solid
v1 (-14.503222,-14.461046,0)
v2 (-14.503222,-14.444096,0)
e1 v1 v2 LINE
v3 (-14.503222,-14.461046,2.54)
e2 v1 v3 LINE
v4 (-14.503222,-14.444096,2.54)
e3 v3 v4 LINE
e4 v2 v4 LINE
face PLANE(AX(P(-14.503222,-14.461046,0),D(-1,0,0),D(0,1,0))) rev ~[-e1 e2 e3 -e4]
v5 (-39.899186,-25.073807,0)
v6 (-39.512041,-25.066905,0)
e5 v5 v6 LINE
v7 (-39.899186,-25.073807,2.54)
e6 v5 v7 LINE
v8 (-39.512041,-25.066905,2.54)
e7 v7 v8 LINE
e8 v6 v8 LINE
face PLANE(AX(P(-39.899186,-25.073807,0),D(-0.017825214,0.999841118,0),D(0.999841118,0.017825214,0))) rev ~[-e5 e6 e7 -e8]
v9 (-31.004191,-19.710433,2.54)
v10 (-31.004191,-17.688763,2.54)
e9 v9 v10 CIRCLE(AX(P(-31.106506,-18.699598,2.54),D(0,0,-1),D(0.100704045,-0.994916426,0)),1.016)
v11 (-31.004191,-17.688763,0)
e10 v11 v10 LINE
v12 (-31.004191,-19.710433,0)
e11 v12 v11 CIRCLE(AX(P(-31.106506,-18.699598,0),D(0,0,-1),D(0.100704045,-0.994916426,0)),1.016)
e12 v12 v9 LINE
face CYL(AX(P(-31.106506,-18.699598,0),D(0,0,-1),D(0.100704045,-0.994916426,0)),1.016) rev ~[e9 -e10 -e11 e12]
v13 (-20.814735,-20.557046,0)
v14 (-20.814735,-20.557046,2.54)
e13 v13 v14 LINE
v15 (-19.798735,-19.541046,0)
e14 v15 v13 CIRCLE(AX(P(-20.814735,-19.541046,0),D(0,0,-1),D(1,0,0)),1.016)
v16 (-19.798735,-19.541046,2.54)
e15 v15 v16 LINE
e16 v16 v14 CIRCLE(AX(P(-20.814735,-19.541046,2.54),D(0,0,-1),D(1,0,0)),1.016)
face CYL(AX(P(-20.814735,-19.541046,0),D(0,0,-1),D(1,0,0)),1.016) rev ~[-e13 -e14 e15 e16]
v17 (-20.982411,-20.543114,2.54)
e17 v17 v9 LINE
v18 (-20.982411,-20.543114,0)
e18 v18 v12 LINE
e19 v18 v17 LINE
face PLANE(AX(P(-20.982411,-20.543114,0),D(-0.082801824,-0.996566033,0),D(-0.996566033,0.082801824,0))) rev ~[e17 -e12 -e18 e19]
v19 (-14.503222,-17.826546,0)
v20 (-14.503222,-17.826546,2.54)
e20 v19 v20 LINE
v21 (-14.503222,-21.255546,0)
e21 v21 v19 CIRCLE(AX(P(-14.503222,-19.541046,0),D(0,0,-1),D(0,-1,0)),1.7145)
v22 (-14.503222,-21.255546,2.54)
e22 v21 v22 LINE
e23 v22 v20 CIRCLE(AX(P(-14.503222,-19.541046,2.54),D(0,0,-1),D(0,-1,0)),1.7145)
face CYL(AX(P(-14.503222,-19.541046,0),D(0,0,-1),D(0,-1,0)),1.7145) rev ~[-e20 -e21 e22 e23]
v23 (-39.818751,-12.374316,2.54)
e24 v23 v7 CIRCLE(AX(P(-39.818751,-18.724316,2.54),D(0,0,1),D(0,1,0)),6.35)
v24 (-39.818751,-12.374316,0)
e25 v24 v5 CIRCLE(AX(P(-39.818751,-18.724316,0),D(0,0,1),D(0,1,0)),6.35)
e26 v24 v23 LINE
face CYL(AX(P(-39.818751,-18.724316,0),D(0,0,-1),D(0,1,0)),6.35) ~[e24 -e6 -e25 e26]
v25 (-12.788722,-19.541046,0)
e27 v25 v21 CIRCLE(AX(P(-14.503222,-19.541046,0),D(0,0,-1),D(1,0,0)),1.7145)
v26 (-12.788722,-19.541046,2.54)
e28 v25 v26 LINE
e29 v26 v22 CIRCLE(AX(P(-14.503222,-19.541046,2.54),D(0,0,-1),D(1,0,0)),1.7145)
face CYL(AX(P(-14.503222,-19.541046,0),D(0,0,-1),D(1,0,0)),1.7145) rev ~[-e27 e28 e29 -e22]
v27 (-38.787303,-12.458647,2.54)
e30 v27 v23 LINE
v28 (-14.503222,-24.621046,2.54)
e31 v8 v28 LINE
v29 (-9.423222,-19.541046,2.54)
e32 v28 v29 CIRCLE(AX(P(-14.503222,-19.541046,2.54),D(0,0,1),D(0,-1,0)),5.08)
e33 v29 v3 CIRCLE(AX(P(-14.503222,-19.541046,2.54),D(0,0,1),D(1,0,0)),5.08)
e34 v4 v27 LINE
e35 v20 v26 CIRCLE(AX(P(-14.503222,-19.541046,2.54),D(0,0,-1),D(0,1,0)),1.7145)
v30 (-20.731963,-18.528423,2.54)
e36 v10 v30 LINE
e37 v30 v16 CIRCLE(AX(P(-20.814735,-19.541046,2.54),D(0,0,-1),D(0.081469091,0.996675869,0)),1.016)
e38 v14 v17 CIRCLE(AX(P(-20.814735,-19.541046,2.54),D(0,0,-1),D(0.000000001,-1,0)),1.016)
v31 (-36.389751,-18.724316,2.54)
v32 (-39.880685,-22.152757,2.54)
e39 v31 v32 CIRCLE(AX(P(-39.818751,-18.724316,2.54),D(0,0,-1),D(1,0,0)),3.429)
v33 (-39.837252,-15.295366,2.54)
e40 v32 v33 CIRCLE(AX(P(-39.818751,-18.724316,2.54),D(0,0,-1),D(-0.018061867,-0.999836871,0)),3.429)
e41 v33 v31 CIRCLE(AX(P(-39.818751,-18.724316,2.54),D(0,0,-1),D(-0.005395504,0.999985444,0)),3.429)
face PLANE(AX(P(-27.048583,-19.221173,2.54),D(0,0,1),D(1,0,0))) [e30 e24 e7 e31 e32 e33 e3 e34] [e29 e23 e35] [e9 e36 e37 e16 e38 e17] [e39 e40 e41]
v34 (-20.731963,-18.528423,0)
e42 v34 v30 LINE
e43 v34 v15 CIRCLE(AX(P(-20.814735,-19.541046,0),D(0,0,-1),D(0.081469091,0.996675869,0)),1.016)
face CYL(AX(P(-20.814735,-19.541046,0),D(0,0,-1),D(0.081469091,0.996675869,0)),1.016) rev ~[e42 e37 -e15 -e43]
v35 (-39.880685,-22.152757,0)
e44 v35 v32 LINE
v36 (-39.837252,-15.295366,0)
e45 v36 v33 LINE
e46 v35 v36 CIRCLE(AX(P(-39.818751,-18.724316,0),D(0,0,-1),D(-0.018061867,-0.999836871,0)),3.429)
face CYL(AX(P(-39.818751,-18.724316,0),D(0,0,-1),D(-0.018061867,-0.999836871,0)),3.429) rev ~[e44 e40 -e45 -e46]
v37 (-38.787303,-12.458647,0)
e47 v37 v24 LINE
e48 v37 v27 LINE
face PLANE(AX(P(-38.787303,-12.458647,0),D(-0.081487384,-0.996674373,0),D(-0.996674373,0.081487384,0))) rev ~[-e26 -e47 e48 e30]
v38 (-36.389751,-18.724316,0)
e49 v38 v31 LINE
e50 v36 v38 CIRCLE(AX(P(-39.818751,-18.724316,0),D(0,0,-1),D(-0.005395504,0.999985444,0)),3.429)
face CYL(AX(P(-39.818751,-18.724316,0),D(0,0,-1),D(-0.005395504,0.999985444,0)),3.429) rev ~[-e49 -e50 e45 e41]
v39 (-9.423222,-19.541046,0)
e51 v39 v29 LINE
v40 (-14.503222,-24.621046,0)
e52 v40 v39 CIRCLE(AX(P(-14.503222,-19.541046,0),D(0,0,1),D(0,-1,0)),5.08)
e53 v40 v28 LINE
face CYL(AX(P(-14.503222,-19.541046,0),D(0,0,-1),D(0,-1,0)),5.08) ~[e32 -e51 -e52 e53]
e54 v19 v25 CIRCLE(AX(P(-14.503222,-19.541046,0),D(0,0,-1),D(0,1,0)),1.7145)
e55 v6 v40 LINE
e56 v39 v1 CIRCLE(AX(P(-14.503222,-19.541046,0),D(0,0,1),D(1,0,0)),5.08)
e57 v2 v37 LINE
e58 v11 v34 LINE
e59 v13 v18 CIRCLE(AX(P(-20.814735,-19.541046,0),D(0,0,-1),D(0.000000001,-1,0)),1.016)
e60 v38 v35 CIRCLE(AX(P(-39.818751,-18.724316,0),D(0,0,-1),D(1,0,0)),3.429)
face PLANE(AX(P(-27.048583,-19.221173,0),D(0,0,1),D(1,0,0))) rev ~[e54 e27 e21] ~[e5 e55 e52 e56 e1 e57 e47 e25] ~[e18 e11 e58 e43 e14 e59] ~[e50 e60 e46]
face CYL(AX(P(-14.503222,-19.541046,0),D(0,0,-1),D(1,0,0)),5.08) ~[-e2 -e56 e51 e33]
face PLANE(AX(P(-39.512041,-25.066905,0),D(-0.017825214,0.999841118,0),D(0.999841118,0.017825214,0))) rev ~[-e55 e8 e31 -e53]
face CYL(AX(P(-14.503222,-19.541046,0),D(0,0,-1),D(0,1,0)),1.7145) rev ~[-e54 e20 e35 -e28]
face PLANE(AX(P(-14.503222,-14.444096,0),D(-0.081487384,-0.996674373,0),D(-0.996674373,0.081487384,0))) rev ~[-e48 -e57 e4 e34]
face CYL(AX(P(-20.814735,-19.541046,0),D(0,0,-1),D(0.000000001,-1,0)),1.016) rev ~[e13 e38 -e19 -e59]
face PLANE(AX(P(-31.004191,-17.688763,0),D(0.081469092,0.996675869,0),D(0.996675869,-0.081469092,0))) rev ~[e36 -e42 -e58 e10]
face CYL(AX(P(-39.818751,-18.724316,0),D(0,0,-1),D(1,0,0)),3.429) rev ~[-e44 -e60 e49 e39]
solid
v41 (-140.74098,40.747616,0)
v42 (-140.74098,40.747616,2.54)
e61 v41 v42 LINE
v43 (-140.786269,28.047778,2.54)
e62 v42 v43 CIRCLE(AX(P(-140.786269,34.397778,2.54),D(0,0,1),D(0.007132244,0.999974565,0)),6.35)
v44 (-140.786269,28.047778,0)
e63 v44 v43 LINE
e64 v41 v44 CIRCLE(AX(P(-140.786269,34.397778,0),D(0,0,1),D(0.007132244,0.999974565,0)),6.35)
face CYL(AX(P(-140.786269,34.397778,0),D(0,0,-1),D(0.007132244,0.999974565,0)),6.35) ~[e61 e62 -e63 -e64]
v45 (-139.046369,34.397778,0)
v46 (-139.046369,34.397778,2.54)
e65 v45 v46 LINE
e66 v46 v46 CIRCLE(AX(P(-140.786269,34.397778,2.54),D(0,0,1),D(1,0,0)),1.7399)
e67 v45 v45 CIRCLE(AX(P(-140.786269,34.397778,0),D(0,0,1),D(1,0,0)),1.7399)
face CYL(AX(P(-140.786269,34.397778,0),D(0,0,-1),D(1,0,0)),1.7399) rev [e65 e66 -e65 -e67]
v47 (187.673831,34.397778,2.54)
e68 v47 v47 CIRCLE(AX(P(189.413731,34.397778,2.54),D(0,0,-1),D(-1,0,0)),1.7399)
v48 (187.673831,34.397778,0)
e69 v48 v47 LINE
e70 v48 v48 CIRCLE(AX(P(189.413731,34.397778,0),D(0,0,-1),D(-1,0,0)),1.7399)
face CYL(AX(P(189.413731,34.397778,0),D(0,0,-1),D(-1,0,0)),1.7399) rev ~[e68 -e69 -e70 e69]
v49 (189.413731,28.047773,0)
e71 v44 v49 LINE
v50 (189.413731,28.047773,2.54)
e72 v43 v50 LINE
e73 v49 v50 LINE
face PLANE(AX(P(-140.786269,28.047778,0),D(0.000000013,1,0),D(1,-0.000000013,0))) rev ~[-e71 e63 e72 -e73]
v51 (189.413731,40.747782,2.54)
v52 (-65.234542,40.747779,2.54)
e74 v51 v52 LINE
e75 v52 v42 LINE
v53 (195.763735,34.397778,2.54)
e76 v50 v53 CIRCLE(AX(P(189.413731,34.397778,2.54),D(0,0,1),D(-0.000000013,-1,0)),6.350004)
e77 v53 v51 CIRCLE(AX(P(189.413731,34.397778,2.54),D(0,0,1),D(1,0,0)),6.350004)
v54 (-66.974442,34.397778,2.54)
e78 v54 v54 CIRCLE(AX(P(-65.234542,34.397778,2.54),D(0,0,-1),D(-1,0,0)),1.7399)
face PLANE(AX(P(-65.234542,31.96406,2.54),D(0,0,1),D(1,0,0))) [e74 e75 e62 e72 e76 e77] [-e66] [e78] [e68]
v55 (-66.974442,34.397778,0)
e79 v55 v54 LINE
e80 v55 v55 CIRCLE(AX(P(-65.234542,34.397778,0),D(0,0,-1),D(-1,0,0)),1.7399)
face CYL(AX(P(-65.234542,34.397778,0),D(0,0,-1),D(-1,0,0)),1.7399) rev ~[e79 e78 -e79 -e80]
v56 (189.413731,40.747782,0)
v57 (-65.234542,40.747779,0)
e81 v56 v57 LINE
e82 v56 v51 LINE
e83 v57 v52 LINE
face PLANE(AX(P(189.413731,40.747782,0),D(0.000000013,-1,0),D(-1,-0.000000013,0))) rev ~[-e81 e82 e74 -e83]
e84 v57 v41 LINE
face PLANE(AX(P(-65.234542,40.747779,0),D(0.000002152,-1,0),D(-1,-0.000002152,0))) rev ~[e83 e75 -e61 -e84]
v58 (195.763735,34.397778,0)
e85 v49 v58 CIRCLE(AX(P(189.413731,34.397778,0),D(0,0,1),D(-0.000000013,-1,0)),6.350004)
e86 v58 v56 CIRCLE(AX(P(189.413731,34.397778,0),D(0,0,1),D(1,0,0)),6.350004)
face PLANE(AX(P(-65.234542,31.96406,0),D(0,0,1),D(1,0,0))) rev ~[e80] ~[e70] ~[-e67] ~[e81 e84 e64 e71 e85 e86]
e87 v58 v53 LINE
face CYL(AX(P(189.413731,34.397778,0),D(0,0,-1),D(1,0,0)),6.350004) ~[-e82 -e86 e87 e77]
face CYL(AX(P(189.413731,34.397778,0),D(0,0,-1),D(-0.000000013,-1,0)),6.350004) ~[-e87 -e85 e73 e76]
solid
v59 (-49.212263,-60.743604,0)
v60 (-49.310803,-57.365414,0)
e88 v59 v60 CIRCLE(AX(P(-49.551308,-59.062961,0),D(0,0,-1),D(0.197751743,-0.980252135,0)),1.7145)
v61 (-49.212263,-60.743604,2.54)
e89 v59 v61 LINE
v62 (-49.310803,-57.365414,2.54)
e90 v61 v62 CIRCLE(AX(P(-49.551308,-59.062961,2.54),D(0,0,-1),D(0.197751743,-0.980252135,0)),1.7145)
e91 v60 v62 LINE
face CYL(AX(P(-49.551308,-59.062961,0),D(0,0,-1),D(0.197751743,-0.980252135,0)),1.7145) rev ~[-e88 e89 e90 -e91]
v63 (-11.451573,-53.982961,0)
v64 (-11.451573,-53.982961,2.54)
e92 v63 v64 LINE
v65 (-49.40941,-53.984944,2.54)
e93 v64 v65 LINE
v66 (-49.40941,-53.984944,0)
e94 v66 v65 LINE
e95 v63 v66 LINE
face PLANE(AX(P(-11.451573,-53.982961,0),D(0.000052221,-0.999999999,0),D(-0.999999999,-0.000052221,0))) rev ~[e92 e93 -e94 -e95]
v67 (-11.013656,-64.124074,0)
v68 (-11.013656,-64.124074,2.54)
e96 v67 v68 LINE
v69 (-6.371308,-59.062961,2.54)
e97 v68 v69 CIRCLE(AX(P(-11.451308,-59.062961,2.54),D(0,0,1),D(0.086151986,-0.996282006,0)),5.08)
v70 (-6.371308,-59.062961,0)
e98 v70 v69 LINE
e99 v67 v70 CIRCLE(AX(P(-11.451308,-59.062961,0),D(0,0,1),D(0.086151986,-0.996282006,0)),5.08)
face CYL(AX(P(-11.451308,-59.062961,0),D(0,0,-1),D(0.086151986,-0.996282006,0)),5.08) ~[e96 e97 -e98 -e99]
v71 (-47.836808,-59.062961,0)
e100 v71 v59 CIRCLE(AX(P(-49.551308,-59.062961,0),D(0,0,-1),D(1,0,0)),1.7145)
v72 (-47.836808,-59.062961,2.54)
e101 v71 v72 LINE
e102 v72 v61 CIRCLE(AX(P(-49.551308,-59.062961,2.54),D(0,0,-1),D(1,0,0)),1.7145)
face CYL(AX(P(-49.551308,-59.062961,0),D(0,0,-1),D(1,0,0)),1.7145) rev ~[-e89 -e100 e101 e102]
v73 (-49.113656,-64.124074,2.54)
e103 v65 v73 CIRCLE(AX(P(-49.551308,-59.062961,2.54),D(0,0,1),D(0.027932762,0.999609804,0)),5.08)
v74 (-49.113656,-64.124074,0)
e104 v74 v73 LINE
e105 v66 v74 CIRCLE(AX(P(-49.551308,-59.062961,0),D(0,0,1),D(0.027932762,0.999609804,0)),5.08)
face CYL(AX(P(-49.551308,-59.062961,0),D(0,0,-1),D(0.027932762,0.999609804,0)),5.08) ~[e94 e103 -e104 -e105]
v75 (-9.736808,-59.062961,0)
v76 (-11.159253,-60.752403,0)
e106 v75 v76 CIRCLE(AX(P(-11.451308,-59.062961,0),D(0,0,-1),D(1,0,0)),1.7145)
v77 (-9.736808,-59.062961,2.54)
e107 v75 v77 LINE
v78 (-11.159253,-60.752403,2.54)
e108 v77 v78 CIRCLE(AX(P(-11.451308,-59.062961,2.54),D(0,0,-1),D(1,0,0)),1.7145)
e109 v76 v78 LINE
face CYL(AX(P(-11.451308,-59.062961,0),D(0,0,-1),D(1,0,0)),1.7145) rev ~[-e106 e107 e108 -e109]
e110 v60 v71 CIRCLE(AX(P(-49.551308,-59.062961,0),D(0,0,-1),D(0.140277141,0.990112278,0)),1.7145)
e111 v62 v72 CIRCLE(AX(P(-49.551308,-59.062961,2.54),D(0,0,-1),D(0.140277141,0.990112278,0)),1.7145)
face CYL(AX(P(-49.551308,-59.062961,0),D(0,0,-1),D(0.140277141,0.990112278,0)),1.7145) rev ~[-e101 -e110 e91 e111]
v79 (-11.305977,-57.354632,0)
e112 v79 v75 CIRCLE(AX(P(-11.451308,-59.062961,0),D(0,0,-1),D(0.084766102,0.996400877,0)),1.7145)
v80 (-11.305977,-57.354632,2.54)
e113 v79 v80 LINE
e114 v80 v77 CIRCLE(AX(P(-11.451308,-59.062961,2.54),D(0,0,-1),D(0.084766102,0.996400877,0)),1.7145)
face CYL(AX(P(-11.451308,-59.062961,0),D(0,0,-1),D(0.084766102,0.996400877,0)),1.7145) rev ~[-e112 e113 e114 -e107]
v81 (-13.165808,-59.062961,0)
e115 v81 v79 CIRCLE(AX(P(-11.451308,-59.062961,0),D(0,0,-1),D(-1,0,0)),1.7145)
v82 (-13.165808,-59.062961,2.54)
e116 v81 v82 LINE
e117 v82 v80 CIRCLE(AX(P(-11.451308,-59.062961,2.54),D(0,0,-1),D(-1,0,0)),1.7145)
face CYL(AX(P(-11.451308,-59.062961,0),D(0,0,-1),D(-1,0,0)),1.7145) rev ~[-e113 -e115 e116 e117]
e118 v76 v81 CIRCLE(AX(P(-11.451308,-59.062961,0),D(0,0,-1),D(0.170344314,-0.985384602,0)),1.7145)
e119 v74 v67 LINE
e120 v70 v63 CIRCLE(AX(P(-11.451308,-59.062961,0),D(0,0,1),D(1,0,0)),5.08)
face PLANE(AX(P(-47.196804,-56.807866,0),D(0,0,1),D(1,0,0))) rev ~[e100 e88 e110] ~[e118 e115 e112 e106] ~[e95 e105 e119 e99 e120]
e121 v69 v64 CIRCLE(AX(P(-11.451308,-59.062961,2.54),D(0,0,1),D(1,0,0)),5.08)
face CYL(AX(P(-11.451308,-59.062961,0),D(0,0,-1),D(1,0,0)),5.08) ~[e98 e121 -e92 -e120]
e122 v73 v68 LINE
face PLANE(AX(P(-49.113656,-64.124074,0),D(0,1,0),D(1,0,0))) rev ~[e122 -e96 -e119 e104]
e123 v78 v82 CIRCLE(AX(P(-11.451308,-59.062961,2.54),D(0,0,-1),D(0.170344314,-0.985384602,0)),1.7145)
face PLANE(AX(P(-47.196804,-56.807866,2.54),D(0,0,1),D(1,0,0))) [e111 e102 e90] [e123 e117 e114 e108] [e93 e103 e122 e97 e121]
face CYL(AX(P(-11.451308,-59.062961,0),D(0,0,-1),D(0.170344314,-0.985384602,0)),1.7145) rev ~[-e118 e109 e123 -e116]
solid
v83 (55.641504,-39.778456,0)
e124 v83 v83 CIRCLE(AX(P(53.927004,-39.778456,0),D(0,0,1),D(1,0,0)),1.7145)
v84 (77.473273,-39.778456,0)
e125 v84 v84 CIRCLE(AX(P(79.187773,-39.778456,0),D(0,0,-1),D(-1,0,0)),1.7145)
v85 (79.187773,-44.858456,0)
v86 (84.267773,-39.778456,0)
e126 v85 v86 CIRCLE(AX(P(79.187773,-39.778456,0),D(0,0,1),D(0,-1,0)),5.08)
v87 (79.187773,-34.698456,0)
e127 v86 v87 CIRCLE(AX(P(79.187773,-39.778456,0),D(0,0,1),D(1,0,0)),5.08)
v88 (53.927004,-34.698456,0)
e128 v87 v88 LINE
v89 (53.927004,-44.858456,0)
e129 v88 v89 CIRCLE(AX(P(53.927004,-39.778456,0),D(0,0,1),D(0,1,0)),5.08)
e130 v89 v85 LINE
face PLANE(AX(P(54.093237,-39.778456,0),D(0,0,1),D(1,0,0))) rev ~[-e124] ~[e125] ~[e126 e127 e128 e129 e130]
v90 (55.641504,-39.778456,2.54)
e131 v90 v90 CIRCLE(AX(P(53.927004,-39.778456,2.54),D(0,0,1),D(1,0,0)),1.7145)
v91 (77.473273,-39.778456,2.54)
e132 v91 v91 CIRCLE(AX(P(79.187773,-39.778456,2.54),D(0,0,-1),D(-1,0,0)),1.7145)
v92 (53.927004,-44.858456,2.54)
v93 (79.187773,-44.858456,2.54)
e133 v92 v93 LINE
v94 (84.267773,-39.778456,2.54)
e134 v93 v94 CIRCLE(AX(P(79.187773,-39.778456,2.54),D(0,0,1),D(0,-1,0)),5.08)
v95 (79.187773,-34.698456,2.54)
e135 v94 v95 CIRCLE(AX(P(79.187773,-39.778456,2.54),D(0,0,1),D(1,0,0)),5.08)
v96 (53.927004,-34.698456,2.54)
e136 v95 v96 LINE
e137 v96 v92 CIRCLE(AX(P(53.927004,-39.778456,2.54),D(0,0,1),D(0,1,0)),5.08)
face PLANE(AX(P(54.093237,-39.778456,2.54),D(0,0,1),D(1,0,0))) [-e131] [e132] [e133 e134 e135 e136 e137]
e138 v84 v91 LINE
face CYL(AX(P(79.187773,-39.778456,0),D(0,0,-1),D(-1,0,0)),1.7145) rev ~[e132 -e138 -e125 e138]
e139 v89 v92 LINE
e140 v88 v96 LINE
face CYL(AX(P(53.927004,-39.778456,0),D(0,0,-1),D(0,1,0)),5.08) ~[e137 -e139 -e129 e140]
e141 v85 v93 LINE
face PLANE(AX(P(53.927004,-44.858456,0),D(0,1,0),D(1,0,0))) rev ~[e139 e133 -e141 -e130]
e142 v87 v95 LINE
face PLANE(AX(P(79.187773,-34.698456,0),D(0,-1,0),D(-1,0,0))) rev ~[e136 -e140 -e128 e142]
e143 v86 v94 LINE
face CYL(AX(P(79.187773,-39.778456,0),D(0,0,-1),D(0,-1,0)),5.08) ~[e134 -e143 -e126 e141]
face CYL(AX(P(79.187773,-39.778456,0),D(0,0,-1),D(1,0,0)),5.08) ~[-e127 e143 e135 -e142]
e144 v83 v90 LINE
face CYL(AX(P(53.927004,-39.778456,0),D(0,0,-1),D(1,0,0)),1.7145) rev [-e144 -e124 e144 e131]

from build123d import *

# Parameters (mm, degrees)
F0_R     = 1.7399
F1_DEPTH = 2.54
F3_DEPTH = 2.54
F4_R     = 1.7145
F5_DEPTH = 2.54
F7_DEPTH = 2.54


# Not quite as in the source:
# - a feature names something its author has since deleted; it is built from what else it names


with BuildPart() as f1:
    # F0 (on Top) → F1 (new body)
    with BuildSketch(Plane.XY):
        with BuildLine():
            Line((-66.9744420796, 34.3977775435), (-71.5845430945, 34.3977775435))
            ThreePointArc((-71.5845430945, 34.3977775435), (-69.7246708578, 29.9076487653), (-65.2345420796, 28.0477765286))
            ThreePointArc((-65.2345420796, 28.0477765286), (-60.7444133014, 29.9076487653), (-58.8845410646, 34.3977775435))
            Line((-58.8845410646, 34.3977775435), (-63.4946420796, 34.3977775435))
            ThreePointArc((-63.4946420796, 34.3977775435), (-65.2345420796, 32.6578775435), (-66.9744420796, 34.3977775435))
        make_face()
        with BuildLine():
            ThreePointArc((-65.2345420796, 40.7477785584), (-69.7246708578, 38.8879063217), (-71.5845430945, 34.3977775435))
            Line((-71.5845430945, 34.3977775435), (-66.9744420796, 34.3977775435))
            ThreePointArc((-66.9744420796, 34.3977775435), (-65.2345420796, 36.1376775435), (-63.4946420796, 34.3977775435))
            Line((-63.4946420796, 34.3977775435), (-58.8845410646, 34.3977775435))
            ThreePointArc((-58.8845410646, 34.3977775435), (-60.7444133014, 38.8879063217), (-65.2345420796, 40.7477785584))
        make_face()
        with BuildLine():
            ThreePointArc((-140.7862693794, 28.0477775435), (-136.2961413189, 29.907649483), (-134.4362693794, 34.3977775435))
            ThreePointArc((-134.4362693794, 34.3977775435), (-136.2801574251, 38.8718646074), (-140.7409796332, 40.7476160327))
            ThreePointArc((-140.7409796332, 40.7476160327), (-147.1362290016, 34.4204225606), (-140.7862693794, 28.0477775435))
        make_face()
        with Locations((-140.7862693794, 34.3977775435)):
            Circle(F0_R, mode=Mode.SUBTRACT)
        with BuildLine():
            ThreePointArc((195.7637350565, 34.3977775435), (193.9038617876, 38.8879087708), (189.4137305353, 40.7477819794))
            ThreePointArc((189.4137305353, 40.7477819794), (184.9235993933, 38.8879087105), (183.0637261847, 34.3977775435))
            ThreePointArc((183.0637261847, 34.3977775435), (184.9235993933, 29.9076463765), (189.4137305353, 28.0477731076))
            ThreePointArc((189.4137305353, 28.0477731076), (193.9038617876, 29.9076463162), (195.7637350565, 34.3977775435))
        make_face()
        with BuildLine():
            ThreePointArc((191.1536306206, 34.3977775435), (189.4137306206, 32.6578775435), (187.6738306206, 34.3977775435))
            ThreePointArc((187.6738306206, 34.3977775435), (189.4137306206, 36.1376775435), (191.1536306206, 34.3977775435))
        make_face(mode=Mode.SUBTRACT)
        with BuildLine():
            Line((-71.5845430945, 34.3977775435), (-134.4362693794, 34.3977775435))
            ThreePointArc((-134.4362693794, 34.3977775435), (-136.2961413189, 29.907649483), (-140.7862693794, 28.0477775435))
            Line((-140.7862693794, 28.0477775435), (-65.2345420796, 28.0477765285))
            ThreePointArc((-65.2345420796, 28.0477765286), (-69.7246708578, 29.9076487653), (-71.5845430945, 34.3977775435))
        make_face()
        with BuildLine():
            ThreePointArc((-140.7409796332, 40.7476160327), (-136.2801574251, 38.8718646074), (-134.4362693794, 34.3977775435))
            Line((-134.4362693794, 34.3977775435), (-71.5845430945, 34.3977775435))
            ThreePointArc((-71.5845430945, 34.3977775435), (-69.7246708578, 38.8879063217), (-65.2345420796, 40.7477785584))
            Line((-65.2345420796, 40.7477785585), (-140.7409796332, 40.7476160327))
        make_face()
        with BuildLine():
            ThreePointArc((-58.8845410646, 34.3977775435), (-60.7444133014, 29.9076487653), (-65.2345420796, 28.0477765286))
            Line((-65.2345420796, 28.0477765285), (189.4137305353, 28.0477731076))
            ThreePointArc((189.4137305353, 28.0477731076), (184.9235993933, 29.9076463765), (183.0637261847, 34.3977775435))
            Line((183.0637261847, 34.3977775435), (-58.8845410646, 34.3977775435))
        make_face()
        with BuildLine():
            Line((189.4137305353, 40.7477819794), (-65.2345420796, 40.7477785585))
            ThreePointArc((-65.2345420796, 40.7477785584), (-60.7444133014, 38.8879063217), (-58.8845410646, 34.3977775435))
            Line((-58.8845410646, 34.3977775435), (183.0637261847, 34.3977775435))
            ThreePointArc((183.0637261847, 34.3977775435), (184.9235993933, 38.8879087105), (189.4137305353, 40.7477819794))
        make_face()
    extrude(amount=F1_DEPTH)


with BuildPart() as f3:
    # F2 (on Top) → F3 (new body)
    with BuildSketch(Plane.XY):
        with BuildLine():
            Line((-14.5032220102, -14.4440956048), (-38.7873029648, -12.4586465028))
            ThreePointArc((-38.7873029648, -12.4586465028), (-34.9776667278, -14.6150092623), (-33.4687510894, -18.7243160414))
            ThreePointArc((-33.4687510894, -18.7243160414), (-35.2214632817, -23.104663609), (-39.5120407945, -25.0669045346))
            Line((-39.5120407945, -25.0669045346), (-14.5032220102, -24.6210461602))
            ThreePointArc((-14.5032220102, -24.6210461602), (-19.5832220102, -19.5410461602), (-14.5032220102, -14.4610461602))
            Line((-14.5032220102, -14.4610461602), (-14.5032220102, -14.4440956048))
        make_face()
        with BuildLine():
            ThreePointArc((-20.7319625899, -18.5284234777), (-20.067623094, -18.8525118323), (-19.7987351869, -19.5410461602))
            ThreePointArc((-19.7987351869, -19.5410461602), (-20.0963146972, -20.2594666499), (-20.8147351869, -20.5570461602))
            ThreePointArc((-20.8147351869, -20.5570461602), (-20.8988618396, -20.5535572497), (-20.9824107159, -20.5431144797))
            Line((-20.9824107159, -20.5431144797), (-31.0041907261, -19.7104334206))
            ThreePointArc((-31.0041907261, -19.7104334206), (-32.1225060361, -18.6995983315), (-31.0041907261, -17.6887632424))
            Line((-31.0041907261, -17.6887632424), (-20.7319625899, -18.5284234777))
        make_face(mode=Mode.SUBTRACT)
        with BuildLine():
            Line((-39.8372522723, -15.2953659533), (-39.8187510894, -12.3743160414))
            ThreePointArc((-39.8187510894, -12.3743160414), (-46.1686237239, -18.6840975724), (-39.899186414, -25.0738065846))
            Line((-39.899186414, -25.0738065846), (-39.880685231, -22.1527566726))
            ThreePointArc((-39.880685231, -22.1527566726), (-43.247682312, -18.7025980681), (-39.8372522723, -15.2953659533))
        make_face()
        with BuildLine():
            Line((-38.7873029648, -12.4586465028), (-39.8187510894, -12.3743160414))
            Line((-39.8187510894, -12.3743160414), (-39.8372522723, -15.2953659533))
            ThreePointArc((-39.8372522723, -15.2953659533), (-37.4006319397, -16.2931145322), (-36.3897510894, -18.7243160414))
            ThreePointArc((-36.3897510894, -18.7243160414), (-37.4160787409, -21.1707842275), (-39.880685231, -22.1527566726))
            Line((-39.880685231, -22.1527566726), (-39.899186414, -25.0738065846))
            Line((-39.899186414, -25.0738065846), (-39.5120407945, -25.0669045346))
            ThreePointArc((-39.5120407945, -25.0669045346), (-35.2214632817, -23.104663609), (-33.4687510894, -18.7243160414))
            ThreePointArc((-33.4687510894, -18.7243160414), (-34.9776667278, -14.6150092623), (-38.7873029648, -12.4586465028))
        make_face()
        with BuildLine():
            ThreePointArc((-14.5032220102, -14.4610461602), (-19.5832220102, -19.5410461602), (-14.5032220102, -24.6210461602))
            Line((-14.5032220102, -24.6210461602), (-14.5032220102, -21.2555461602))
            ThreePointArc((-14.5032220102, -21.2555461602), (-16.2177220102, -19.5410461602), (-14.5032220102, -17.8265461602))
            Line((-14.5032220102, -17.8265461602), (-14.5032220102, -14.4610461602))
        make_face()
        with BuildLine():
            Line((-14.5032220102, -21.2555461602), (-14.5032220102, -24.6210461602))
            ThreePointArc((-14.5032220102, -24.6210461602), (-10.9111195618, -23.1331486087), (-9.4232220102, -19.5410461602))
            ThreePointArc((-9.4232220102, -19.5410461602), (-10.9111195618, -15.9489437118), (-14.5032220102, -14.4610461602))
            Line((-14.5032220102, -14.4610461602), (-14.5032220102, -17.8265461602))
            ThreePointArc((-14.5032220102, -17.8265461602), (-13.2908874339, -18.3287115839), (-12.7887220102, -19.5410461602))
            ThreePointArc((-12.7887220102, -19.5410461602), (-13.2908874339, -20.7533807366), (-14.5032220102, -21.2555461602))
        make_face()
    extrude(amount=F3_DEPTH)


with BuildPart() as f5:
    # F4 (on Top) → F5 (new body)
    with BuildSketch(Plane.XY):
        with BuildLine():
            ThreePointArc((53.9270043373, -44.8584560919), (57.5191067857, -43.3705585403), (59.0070043373, -39.7784560919))
            ThreePointArc((59.0070043373, -39.7784560919), (57.5191067857, -36.1863536435), (53.9270043373, -34.6984560919))
            ThreePointArc((53.9270043373, -34.6984560919), (48.8470043373, -39.7784560919), (53.9270043373, -44.8584560919))
        make_face()
        with Locations((53.9270043373, -39.7784560919)):
            Circle(F4_R, mode=Mode.SUBTRACT)
        with BuildLine():
            ThreePointArc((53.9270043373, -34.6984560919), (57.5191067857, -36.1863536435), (59.0070043373, -39.7784560919))
            Line((59.0070043373, -39.7784560919), (74.1077731681, -39.7784560919))
            ThreePointArc((74.1077731681, -39.7784560919), (75.5956707197, -36.1863536435), (79.1877731681, -34.6984560919))
            Line((79.1877731681, -34.6984560919), (53.9270043373, -34.6984560919))
        make_face()
        with BuildLine():
            Line((74.1077731681, -39.7784560919), (59.0070043373, -39.7784560919))
            ThreePointArc((59.0070043373, -39.7784560919), (57.5191067857, -43.3705585403), (53.9270043373, -44.8584560919))
            Line((53.9270043373, -44.8584560919), (79.1877731681, -44.8584560919))
            ThreePointArc((79.1877731681, -44.8584560919), (75.5956707197, -43.3705585403), (74.1077731681, -39.7784560919))
        make_face()
        with BuildLine():
            ThreePointArc((79.1877731681, -34.6984560919), (75.5956707197, -36.1863536435), (74.1077731681, -39.7784560919))
            ThreePointArc((74.1077731681, -39.7784560919), (75.5956707197, -43.3705585403), (79.1877731681, -44.8584560919))
            ThreePointArc((79.1877731681, -44.8584560919), (82.7798756165, -43.3705585403), (84.2677731681, -39.7784560919))
            ThreePointArc((84.2677731681, -39.7784560919), (82.7798756165, -36.1863536435), (79.1877731681, -34.6984560919))
        make_face()
        with BuildLine():
            ThreePointArc((80.9022731681, -39.7784560919), (79.1877731681, -41.4929560919), (77.4732731681, -39.7784560919))
            ThreePointArc((77.4732731681, -39.7784560919), (79.1877731681, -38.0639560919), (80.9022731681, -39.7784560919))
        make_face(mode=Mode.SUBTRACT)
    extrude(amount=F5_DEPTH)


with BuildPart() as f7:
    # F6 (on Top) → F7 (new body)
    with BuildSketch(Plane.XY):
        with BuildLine():
            ThreePointArc((-49.3108029973, -57.3654139877), (-48.2567317102, -57.9388698208), (-47.8368081551, -59.062961489))
            Line((-47.8368081551, -59.062961489), (-44.4713081551, -59.062961489))
            ThreePointArc((-44.4713081551, -59.062961489), (-45.9093825635, -55.5213830294), (-49.4094097241, -53.9849436832))
            Line((-49.4094097241, -53.9849436832), (-49.3108029973, -57.3654139877))
        make_face()
        with BuildLine():
            Line((-44.4713081551, -59.062961489), (-47.8368081551, -59.062961489))
            ThreePointArc((-47.8368081551, -59.062961489), (-48.2245068277, -60.1488291087), (-49.2122627922, -60.7436037745))
            Line((-49.2122627922, -60.7436037745), (-49.1136560654, -64.1240740789))
            ThreePointArc((-49.1136560654, -64.1240740789), (-45.8076687083, -62.4968461248), (-44.4713081551, -59.062961489))
        make_face()
        with BuildLine():
            ThreePointArc((-49.4094097241, -53.9849436832), (-45.9093825635, -55.5213830294), (-44.4713081551, -59.062961489))
            Line((-44.4713081551, -59.062961489), (-28.0248081551, -59.062961489))
            Line((-28.0248081551, -59.062961489), (-16.5313081551, -59.062961489))
            ThreePointArc((-16.5313081551, -59.062961489), (-15.0435043934, -55.4709528329), (-11.4515734366, -53.9829614959))
            Line((-11.4515734366, -53.9829614959), (-49.4094097241, -53.9849436832))
        make_face()
        with BuildLine():
            Line((-28.0248081551, -59.062961489), (-44.4713081551, -59.062961489))
            ThreePointArc((-44.4713081551, -59.062961489), (-45.8076687083, -62.4968461248), (-49.1136560654, -64.1240740789))
            Line((-49.1136560654, -64.1240740789), (-11.8889602447, -64.1240740789))
            ThreePointArc((-11.8889602447, -64.1240740789), (-15.1949476019, -62.4968461248), (-16.5313081551, -59.062961489))
            Line((-16.5313081551, -59.062961489), (-28.0248081551, -59.062961489))
        make_face()
        with BuildLine():
            ThreePointArc((-49.2122627922, -60.7436037745), (-51.2650792192, -59.1129513838), (-49.3108029973, -57.3654139877))
            Line((-49.3108029973, -57.3654139877), (-49.4094097241, -53.9849436832))
            ThreePointArc((-49.4094097241, -53.9849436832), (-54.6291483452, -59.2110796959), (-49.1136560654, -64.1240740789))
            Line((-49.1136560654, -64.1240740789), (-49.2122627922, -60.7436037745))
        make_face()
        with BuildLine():
            ThreePointArc((-11.4515734366, -53.9829614959), (-15.0435043934, -55.4709528329), (-16.5313081551, -59.062961489))
            Line((-16.5313081551, -59.062961489), (-13.1658081551, -59.062961489))
            ThreePointArc((-13.1658081551, -59.062961489), (-12.6111226715, -57.8002895056), (-11.3059766736, -57.3546321851))
            Line((-11.3059766736, -57.3546321851), (-11.4515734366, -53.9829614959))
        make_face()
        with BuildLine():
            Line((-13.1658081551, -59.062961489), (-16.5313081551, -59.062961489))
            ThreePointArc((-16.5313081551, -59.062961489), (-15.1949476019, -62.4968461248), (-11.8889602447, -64.1240740789))
            Line((-11.8889602447, -64.1240740789), (-11.0136560654, -64.1240740789))
            Line((-11.0136560654, -64.1240740789), (-11.1592528283, -60.7524033897))
            ThreePointArc((-11.1592528283, -60.7524033897), (-12.5555684034, -60.3744947725), (-13.1658081551, -59.062961489))
        make_face()
        with BuildLine():
            ThreePointArc((-6.3713081551, -59.062961489), (-7.859299499, -55.4707652506), (-11.4515734366, -53.9829614959))
            Line((-11.4515734366, -53.9829614959), (-11.3059766736, -57.3546321851))
            ThreePointArc((-11.3059766736, -57.3546321851), (-10.1886361717, -57.9031469725), (-9.7368081551, -59.062961489))
            ThreePointArc((-9.7368081551, -59.062961489), (-10.1397748715, -60.1672217374), (-11.1592528283, -60.7524033897))
            Line((-11.1592528283, -60.7524033897), (-11.0136560654, -64.1240740789))
            ThreePointArc((-11.0136560654, -64.1240740789), (-7.7076687083, -62.4968461248), (-6.3713081551, -59.062961489))
        make_face()
    extrude(amount=F7_DEPTH)


solid = Compound([f1.part, f3.part, f5.part, f7.part])
